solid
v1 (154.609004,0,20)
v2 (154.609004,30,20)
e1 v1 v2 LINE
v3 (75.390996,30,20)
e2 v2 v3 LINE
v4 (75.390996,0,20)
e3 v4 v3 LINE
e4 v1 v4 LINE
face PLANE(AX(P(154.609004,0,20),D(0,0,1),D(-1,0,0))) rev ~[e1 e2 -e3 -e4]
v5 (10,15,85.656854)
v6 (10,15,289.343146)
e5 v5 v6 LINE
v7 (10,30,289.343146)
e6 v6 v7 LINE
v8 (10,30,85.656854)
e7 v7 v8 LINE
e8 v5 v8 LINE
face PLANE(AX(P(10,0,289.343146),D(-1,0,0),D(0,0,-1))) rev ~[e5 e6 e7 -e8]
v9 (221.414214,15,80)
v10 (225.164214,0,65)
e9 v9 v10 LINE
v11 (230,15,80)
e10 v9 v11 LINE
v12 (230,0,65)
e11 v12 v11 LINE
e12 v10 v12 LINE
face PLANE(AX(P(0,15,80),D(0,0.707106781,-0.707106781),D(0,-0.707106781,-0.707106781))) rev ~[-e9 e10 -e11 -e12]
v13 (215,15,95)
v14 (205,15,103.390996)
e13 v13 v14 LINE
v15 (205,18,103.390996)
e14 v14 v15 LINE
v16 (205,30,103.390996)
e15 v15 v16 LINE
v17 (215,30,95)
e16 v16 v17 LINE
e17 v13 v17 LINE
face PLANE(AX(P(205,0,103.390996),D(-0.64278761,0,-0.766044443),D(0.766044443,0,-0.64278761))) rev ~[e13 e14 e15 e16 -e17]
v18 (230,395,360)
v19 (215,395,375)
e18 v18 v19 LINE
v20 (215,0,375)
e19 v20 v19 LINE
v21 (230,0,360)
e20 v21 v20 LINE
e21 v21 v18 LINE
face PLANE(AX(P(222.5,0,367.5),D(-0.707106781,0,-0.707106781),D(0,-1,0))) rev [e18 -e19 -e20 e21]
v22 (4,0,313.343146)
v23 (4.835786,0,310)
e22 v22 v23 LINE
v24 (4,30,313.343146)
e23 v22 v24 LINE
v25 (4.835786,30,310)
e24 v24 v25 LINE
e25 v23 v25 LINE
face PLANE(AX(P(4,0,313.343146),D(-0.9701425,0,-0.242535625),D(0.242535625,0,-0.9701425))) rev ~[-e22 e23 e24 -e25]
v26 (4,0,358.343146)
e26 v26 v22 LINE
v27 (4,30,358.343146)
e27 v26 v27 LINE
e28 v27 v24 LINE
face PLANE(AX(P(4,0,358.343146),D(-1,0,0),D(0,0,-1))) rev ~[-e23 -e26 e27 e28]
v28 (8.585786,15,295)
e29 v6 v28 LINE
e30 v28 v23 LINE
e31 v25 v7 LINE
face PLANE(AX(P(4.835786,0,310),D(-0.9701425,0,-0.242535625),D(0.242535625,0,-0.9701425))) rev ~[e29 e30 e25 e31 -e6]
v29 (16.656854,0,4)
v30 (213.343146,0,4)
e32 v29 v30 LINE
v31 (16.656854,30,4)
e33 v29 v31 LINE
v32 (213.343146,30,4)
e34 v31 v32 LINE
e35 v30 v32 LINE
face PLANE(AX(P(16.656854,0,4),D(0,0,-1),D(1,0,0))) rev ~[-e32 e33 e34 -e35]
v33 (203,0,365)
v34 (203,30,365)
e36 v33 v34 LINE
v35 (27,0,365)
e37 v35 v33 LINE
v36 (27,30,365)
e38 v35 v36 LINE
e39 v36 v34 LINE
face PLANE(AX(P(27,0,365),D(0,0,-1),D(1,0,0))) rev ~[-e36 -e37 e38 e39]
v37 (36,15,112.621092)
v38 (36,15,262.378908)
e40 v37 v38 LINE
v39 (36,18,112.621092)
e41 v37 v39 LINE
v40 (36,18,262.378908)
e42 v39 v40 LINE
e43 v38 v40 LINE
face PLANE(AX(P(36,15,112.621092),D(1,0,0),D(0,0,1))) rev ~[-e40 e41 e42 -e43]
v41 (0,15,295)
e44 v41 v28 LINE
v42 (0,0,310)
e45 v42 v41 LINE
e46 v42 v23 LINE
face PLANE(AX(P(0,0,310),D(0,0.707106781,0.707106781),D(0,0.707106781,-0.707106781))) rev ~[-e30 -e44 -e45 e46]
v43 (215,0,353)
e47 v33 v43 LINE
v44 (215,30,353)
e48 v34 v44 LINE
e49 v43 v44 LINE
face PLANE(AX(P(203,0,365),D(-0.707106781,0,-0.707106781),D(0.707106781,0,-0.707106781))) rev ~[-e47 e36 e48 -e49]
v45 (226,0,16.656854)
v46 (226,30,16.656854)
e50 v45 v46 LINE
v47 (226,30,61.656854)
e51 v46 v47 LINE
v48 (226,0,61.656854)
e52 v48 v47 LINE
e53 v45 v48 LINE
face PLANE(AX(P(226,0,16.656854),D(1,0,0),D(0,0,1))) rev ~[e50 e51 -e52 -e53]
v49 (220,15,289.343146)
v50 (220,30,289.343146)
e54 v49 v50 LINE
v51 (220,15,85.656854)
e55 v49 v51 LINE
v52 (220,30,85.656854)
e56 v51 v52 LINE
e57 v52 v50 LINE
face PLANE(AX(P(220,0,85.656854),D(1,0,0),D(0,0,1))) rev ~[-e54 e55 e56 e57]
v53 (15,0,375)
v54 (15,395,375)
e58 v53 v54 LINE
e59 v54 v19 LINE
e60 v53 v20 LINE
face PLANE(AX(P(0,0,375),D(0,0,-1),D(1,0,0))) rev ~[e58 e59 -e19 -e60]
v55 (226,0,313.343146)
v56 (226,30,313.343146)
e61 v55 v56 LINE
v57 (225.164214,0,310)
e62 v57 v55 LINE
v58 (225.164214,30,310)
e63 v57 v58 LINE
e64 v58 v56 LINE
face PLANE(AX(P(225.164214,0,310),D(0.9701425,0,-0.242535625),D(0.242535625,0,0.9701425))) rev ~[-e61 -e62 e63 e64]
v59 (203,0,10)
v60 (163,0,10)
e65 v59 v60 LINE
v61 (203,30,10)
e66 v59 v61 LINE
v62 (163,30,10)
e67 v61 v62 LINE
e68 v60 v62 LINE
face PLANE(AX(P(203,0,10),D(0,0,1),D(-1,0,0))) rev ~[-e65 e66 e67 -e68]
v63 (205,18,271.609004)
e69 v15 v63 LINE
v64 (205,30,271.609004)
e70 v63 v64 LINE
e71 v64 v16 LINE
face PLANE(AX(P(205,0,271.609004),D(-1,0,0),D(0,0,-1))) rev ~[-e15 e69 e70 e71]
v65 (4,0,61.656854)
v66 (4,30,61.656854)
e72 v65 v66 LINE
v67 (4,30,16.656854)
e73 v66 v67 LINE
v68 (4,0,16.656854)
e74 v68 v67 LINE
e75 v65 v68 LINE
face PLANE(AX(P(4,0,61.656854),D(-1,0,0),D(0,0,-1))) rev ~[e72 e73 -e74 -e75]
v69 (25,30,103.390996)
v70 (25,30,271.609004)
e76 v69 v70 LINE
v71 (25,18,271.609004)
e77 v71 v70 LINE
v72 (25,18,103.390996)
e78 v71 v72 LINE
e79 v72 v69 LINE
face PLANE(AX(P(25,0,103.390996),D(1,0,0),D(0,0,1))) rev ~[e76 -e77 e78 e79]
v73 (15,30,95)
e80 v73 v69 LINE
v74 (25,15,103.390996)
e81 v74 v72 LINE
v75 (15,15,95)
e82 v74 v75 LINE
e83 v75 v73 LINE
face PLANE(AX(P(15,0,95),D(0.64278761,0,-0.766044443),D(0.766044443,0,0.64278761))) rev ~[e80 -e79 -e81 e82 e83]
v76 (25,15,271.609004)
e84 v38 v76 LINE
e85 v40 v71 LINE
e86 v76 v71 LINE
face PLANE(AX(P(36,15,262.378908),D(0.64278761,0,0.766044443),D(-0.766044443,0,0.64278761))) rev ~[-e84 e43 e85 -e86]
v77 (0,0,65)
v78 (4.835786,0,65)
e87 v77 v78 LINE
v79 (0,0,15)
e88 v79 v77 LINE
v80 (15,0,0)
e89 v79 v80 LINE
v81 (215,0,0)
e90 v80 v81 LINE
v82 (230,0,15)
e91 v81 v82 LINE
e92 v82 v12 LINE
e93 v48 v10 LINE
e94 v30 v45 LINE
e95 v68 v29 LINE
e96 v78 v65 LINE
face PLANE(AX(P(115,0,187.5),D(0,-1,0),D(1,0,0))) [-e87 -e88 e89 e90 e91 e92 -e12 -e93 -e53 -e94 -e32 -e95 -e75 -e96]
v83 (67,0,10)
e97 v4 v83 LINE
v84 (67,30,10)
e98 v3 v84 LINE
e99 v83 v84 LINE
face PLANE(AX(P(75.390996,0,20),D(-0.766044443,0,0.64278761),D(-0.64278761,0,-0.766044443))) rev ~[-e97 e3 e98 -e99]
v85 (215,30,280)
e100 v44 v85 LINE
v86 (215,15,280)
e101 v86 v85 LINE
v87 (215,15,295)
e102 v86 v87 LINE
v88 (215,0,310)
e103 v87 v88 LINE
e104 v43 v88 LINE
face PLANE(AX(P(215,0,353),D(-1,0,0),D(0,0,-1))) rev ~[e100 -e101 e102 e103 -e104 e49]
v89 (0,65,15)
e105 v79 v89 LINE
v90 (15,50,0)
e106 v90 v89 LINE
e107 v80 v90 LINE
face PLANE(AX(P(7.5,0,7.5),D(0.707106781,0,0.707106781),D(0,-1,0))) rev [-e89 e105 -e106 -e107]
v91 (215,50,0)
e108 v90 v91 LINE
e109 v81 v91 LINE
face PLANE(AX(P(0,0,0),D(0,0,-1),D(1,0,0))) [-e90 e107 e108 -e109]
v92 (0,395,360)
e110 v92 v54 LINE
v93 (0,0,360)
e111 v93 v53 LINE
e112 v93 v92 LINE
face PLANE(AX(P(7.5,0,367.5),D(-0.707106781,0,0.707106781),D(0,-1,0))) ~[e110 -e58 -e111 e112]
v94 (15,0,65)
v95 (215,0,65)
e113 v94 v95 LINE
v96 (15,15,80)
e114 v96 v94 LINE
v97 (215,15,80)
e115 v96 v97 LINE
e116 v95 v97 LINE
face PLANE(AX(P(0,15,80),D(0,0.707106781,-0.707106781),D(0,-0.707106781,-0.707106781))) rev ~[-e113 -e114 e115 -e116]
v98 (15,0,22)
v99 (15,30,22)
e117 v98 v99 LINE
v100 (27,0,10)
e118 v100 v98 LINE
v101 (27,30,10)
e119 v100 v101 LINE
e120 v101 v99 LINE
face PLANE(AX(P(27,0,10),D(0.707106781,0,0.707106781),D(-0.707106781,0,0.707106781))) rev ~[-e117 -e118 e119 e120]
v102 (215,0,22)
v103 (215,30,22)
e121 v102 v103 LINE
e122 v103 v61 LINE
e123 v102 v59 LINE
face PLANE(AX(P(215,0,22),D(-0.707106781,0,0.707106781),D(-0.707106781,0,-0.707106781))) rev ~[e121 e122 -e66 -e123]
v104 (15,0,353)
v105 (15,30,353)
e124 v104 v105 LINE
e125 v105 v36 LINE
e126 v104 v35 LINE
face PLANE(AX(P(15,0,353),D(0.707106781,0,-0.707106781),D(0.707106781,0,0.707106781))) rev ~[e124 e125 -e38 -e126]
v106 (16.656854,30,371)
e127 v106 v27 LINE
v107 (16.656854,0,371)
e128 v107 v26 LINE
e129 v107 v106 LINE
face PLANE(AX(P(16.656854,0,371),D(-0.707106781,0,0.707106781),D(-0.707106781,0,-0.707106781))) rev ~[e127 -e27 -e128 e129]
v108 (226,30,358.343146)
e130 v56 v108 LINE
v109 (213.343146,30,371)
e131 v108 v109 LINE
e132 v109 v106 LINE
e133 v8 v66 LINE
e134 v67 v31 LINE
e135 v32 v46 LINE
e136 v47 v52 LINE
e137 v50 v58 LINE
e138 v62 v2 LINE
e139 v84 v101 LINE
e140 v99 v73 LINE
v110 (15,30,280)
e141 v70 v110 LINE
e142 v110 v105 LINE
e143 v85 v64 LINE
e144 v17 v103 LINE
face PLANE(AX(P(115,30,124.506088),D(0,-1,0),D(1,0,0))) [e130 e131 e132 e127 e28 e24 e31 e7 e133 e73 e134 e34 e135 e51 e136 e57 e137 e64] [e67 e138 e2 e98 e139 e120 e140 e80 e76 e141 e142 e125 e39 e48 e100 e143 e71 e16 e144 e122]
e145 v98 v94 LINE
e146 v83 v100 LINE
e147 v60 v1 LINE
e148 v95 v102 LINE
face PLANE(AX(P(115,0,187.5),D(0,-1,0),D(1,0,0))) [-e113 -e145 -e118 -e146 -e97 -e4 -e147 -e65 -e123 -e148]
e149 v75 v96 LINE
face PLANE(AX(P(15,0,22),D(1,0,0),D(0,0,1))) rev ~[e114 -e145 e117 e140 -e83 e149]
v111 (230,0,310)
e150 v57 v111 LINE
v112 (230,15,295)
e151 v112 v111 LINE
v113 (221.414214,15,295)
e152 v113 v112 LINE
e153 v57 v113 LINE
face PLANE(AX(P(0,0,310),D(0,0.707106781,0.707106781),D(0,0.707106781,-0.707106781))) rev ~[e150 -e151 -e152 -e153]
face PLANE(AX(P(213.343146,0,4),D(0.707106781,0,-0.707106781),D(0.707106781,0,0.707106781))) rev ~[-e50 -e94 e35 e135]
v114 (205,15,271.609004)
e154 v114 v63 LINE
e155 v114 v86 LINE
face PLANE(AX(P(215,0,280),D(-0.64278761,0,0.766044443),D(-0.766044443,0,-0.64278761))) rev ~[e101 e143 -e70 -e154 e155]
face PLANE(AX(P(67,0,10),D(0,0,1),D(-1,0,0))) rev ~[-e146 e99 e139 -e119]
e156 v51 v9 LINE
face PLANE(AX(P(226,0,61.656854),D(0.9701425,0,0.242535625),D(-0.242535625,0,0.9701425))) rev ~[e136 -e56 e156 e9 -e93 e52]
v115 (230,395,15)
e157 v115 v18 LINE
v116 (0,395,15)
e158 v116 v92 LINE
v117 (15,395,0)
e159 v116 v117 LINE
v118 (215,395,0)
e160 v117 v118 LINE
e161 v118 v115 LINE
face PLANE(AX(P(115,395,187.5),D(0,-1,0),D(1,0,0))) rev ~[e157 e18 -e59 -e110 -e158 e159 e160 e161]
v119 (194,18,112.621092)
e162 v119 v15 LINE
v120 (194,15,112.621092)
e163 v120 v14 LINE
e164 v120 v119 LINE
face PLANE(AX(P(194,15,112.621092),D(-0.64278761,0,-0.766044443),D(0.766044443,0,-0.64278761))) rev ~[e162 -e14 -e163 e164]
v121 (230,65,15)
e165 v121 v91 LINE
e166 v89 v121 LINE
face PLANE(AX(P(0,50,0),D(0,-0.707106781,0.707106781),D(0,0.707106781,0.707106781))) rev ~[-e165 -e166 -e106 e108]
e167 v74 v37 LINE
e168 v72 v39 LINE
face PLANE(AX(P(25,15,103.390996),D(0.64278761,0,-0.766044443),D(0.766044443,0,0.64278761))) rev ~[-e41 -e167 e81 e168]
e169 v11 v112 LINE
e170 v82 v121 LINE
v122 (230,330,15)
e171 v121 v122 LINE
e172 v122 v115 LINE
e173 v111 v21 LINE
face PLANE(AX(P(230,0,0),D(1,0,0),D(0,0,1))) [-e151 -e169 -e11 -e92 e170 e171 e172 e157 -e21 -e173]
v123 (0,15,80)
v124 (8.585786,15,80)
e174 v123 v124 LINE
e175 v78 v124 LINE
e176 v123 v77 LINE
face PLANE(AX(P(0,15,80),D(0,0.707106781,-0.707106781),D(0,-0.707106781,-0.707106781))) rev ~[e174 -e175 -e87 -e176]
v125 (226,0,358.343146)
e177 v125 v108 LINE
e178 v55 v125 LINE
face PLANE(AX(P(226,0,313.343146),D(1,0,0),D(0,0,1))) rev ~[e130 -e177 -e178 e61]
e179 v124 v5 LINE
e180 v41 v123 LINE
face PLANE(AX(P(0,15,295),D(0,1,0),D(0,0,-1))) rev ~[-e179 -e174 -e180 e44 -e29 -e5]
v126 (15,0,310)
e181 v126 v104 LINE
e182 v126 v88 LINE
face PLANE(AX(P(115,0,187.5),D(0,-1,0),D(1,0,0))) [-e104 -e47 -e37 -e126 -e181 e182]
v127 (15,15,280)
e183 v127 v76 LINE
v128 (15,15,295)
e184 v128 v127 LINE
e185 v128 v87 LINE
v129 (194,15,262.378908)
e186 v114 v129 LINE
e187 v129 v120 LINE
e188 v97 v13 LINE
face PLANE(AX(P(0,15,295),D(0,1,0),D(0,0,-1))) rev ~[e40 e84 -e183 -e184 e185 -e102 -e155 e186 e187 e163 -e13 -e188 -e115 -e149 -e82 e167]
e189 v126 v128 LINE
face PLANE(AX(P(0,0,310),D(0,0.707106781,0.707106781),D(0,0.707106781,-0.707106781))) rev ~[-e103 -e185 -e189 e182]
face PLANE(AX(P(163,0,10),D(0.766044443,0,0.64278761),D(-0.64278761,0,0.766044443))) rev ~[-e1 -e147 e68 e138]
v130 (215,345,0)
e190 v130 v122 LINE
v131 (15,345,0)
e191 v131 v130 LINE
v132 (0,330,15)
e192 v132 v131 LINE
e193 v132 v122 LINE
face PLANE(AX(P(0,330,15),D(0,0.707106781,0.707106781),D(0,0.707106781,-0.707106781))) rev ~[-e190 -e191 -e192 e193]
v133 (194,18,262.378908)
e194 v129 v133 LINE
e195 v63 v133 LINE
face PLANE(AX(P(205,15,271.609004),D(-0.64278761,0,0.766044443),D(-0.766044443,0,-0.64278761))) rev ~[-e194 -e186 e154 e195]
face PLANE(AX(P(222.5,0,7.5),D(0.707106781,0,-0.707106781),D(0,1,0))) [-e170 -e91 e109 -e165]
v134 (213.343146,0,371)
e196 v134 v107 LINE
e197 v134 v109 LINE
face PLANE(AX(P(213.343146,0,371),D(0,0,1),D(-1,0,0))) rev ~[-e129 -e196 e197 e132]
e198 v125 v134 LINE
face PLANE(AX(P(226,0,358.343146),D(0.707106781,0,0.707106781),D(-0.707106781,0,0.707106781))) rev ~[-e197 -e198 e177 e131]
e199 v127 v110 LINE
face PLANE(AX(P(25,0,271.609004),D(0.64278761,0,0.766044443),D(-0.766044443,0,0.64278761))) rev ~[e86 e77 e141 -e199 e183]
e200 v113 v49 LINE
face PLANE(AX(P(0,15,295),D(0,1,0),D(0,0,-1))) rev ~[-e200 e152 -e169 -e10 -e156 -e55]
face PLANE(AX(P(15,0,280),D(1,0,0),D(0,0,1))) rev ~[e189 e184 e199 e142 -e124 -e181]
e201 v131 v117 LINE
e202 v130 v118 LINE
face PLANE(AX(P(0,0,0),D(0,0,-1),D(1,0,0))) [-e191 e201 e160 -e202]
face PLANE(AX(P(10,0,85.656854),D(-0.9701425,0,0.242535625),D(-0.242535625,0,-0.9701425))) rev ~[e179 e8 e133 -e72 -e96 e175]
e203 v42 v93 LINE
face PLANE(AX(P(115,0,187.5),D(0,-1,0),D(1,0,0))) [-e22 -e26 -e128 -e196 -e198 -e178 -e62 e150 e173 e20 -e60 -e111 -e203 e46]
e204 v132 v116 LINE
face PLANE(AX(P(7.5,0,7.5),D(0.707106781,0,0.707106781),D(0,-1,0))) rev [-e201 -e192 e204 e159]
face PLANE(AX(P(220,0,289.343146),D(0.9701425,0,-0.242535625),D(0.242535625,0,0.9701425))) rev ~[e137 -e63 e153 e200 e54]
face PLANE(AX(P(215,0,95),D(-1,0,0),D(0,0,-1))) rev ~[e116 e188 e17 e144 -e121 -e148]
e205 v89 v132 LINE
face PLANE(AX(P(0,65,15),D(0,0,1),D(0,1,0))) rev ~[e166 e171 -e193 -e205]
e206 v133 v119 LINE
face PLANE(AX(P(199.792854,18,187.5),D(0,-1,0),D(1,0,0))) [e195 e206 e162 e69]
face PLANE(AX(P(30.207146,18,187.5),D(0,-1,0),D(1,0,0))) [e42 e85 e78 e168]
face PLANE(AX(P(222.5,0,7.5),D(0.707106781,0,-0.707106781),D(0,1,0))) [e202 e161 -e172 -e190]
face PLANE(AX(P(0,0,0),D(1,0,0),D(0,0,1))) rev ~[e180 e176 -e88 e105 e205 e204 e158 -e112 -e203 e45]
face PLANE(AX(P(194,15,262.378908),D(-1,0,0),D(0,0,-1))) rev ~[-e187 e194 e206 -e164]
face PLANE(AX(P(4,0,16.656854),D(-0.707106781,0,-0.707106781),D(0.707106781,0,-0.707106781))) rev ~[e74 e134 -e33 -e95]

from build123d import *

# Parameters (mm, degrees)
F0_W     = 230
F0_H     = 375
F1_DEPTH = 395
F2_SIZE  = 15
F4_DEPTH = 230.001
F6_DEPTH = 30
F8_DEPTH = 3


with BuildPart() as f1:
    # F0 (on Front) → F1 (new body)
    with BuildSketch(Plane.XZ):
        with Locations((115, 187.5)):
            Rectangle(F0_W, F0_H)
    extrude(amount=-F1_DEPTH)

    # F2
    f2_edges = [f1.edges().sort_by_distance(p)[0] for p in [
        (0, 197.5, 375),
        (0, 197.5, 0),
        (230, 197.5, 375),
        (230, 197.5, 0),
    ]]
    chamfer(f2_edges, length=F2_SIZE)

    # F3 (on face) → F4 (cut, through all)
    with BuildSketch(Plane(origin=(0, 0, 0), x_dir=(0, -1, 0), z_dir=(-1, 0, 0))):
        Polygon((-50, 0), (-65, 15), (-330, 15), (-345, 0), align=None)
        Polygon((-15, 80), (0, 65), (0, 310), (-15, 295), align=None)
    extrude(amount=-F4_DEPTH, mode=Mode.SUBTRACT)

    # F5 (on face) → F6 (cut)
    with BuildSketch(Plane.XZ):
        Polygon((15, 280), (15, 310), (4.8357864376, 310), (10, 289.3431457505), (10, 85.6568542495), (4, 61.6568542495), (4, 16.6568542495), (16.6568542495, 4), (115, 4), (213.3431457505, 4), (226, 16.6568542495), (226, 61.6568542495), (220, 85.6568542495), (220, 289.3431457505), (225.1642135624, 310), (215, 310), (215, 280), (205, 271.6090036882), (205, 103.3909963118), (215, 95), (215, 22), (203, 10), (163, 10), (154.6090036882, 20), (115, 20), (75.3909963118, 20), (67, 10), (27, 10), (15, 22), (15, 95), (25, 103.3909963118), (25, 271.6090036882), align=None)
        Polygon((15, 310), (15, 353), (27, 365), (115, 365), (203, 365), (215, 353), (215, 310), (225.1642135624, 310), (226, 313.3431457505), (226, 358.3431457505), (213.3431457505, 371), (115, 371), (16.6568542495, 371), (4, 358.3431457505), (4, 313.3431457505), (4.8357864376, 310), align=None)
    extrude(amount=-F6_DEPTH, mode=Mode.SUBTRACT)

    # F7 (on face) → F8 (cut)
    with BuildSketch(Plane.XZ.offset(-15)):
        Polygon((36, 262.3789077453), (25, 271.6090036882), (25, 103.3909963118), (36, 112.6210922547), align=None)
        Polygon((205, 103.3909963118), (205, 271.6090036882), (194, 262.3789077453), (194, 112.6210922547), align=None)
    extrude(amount=-F8_DEPTH, mode=Mode.SUBTRACT)


solid = f1.part
